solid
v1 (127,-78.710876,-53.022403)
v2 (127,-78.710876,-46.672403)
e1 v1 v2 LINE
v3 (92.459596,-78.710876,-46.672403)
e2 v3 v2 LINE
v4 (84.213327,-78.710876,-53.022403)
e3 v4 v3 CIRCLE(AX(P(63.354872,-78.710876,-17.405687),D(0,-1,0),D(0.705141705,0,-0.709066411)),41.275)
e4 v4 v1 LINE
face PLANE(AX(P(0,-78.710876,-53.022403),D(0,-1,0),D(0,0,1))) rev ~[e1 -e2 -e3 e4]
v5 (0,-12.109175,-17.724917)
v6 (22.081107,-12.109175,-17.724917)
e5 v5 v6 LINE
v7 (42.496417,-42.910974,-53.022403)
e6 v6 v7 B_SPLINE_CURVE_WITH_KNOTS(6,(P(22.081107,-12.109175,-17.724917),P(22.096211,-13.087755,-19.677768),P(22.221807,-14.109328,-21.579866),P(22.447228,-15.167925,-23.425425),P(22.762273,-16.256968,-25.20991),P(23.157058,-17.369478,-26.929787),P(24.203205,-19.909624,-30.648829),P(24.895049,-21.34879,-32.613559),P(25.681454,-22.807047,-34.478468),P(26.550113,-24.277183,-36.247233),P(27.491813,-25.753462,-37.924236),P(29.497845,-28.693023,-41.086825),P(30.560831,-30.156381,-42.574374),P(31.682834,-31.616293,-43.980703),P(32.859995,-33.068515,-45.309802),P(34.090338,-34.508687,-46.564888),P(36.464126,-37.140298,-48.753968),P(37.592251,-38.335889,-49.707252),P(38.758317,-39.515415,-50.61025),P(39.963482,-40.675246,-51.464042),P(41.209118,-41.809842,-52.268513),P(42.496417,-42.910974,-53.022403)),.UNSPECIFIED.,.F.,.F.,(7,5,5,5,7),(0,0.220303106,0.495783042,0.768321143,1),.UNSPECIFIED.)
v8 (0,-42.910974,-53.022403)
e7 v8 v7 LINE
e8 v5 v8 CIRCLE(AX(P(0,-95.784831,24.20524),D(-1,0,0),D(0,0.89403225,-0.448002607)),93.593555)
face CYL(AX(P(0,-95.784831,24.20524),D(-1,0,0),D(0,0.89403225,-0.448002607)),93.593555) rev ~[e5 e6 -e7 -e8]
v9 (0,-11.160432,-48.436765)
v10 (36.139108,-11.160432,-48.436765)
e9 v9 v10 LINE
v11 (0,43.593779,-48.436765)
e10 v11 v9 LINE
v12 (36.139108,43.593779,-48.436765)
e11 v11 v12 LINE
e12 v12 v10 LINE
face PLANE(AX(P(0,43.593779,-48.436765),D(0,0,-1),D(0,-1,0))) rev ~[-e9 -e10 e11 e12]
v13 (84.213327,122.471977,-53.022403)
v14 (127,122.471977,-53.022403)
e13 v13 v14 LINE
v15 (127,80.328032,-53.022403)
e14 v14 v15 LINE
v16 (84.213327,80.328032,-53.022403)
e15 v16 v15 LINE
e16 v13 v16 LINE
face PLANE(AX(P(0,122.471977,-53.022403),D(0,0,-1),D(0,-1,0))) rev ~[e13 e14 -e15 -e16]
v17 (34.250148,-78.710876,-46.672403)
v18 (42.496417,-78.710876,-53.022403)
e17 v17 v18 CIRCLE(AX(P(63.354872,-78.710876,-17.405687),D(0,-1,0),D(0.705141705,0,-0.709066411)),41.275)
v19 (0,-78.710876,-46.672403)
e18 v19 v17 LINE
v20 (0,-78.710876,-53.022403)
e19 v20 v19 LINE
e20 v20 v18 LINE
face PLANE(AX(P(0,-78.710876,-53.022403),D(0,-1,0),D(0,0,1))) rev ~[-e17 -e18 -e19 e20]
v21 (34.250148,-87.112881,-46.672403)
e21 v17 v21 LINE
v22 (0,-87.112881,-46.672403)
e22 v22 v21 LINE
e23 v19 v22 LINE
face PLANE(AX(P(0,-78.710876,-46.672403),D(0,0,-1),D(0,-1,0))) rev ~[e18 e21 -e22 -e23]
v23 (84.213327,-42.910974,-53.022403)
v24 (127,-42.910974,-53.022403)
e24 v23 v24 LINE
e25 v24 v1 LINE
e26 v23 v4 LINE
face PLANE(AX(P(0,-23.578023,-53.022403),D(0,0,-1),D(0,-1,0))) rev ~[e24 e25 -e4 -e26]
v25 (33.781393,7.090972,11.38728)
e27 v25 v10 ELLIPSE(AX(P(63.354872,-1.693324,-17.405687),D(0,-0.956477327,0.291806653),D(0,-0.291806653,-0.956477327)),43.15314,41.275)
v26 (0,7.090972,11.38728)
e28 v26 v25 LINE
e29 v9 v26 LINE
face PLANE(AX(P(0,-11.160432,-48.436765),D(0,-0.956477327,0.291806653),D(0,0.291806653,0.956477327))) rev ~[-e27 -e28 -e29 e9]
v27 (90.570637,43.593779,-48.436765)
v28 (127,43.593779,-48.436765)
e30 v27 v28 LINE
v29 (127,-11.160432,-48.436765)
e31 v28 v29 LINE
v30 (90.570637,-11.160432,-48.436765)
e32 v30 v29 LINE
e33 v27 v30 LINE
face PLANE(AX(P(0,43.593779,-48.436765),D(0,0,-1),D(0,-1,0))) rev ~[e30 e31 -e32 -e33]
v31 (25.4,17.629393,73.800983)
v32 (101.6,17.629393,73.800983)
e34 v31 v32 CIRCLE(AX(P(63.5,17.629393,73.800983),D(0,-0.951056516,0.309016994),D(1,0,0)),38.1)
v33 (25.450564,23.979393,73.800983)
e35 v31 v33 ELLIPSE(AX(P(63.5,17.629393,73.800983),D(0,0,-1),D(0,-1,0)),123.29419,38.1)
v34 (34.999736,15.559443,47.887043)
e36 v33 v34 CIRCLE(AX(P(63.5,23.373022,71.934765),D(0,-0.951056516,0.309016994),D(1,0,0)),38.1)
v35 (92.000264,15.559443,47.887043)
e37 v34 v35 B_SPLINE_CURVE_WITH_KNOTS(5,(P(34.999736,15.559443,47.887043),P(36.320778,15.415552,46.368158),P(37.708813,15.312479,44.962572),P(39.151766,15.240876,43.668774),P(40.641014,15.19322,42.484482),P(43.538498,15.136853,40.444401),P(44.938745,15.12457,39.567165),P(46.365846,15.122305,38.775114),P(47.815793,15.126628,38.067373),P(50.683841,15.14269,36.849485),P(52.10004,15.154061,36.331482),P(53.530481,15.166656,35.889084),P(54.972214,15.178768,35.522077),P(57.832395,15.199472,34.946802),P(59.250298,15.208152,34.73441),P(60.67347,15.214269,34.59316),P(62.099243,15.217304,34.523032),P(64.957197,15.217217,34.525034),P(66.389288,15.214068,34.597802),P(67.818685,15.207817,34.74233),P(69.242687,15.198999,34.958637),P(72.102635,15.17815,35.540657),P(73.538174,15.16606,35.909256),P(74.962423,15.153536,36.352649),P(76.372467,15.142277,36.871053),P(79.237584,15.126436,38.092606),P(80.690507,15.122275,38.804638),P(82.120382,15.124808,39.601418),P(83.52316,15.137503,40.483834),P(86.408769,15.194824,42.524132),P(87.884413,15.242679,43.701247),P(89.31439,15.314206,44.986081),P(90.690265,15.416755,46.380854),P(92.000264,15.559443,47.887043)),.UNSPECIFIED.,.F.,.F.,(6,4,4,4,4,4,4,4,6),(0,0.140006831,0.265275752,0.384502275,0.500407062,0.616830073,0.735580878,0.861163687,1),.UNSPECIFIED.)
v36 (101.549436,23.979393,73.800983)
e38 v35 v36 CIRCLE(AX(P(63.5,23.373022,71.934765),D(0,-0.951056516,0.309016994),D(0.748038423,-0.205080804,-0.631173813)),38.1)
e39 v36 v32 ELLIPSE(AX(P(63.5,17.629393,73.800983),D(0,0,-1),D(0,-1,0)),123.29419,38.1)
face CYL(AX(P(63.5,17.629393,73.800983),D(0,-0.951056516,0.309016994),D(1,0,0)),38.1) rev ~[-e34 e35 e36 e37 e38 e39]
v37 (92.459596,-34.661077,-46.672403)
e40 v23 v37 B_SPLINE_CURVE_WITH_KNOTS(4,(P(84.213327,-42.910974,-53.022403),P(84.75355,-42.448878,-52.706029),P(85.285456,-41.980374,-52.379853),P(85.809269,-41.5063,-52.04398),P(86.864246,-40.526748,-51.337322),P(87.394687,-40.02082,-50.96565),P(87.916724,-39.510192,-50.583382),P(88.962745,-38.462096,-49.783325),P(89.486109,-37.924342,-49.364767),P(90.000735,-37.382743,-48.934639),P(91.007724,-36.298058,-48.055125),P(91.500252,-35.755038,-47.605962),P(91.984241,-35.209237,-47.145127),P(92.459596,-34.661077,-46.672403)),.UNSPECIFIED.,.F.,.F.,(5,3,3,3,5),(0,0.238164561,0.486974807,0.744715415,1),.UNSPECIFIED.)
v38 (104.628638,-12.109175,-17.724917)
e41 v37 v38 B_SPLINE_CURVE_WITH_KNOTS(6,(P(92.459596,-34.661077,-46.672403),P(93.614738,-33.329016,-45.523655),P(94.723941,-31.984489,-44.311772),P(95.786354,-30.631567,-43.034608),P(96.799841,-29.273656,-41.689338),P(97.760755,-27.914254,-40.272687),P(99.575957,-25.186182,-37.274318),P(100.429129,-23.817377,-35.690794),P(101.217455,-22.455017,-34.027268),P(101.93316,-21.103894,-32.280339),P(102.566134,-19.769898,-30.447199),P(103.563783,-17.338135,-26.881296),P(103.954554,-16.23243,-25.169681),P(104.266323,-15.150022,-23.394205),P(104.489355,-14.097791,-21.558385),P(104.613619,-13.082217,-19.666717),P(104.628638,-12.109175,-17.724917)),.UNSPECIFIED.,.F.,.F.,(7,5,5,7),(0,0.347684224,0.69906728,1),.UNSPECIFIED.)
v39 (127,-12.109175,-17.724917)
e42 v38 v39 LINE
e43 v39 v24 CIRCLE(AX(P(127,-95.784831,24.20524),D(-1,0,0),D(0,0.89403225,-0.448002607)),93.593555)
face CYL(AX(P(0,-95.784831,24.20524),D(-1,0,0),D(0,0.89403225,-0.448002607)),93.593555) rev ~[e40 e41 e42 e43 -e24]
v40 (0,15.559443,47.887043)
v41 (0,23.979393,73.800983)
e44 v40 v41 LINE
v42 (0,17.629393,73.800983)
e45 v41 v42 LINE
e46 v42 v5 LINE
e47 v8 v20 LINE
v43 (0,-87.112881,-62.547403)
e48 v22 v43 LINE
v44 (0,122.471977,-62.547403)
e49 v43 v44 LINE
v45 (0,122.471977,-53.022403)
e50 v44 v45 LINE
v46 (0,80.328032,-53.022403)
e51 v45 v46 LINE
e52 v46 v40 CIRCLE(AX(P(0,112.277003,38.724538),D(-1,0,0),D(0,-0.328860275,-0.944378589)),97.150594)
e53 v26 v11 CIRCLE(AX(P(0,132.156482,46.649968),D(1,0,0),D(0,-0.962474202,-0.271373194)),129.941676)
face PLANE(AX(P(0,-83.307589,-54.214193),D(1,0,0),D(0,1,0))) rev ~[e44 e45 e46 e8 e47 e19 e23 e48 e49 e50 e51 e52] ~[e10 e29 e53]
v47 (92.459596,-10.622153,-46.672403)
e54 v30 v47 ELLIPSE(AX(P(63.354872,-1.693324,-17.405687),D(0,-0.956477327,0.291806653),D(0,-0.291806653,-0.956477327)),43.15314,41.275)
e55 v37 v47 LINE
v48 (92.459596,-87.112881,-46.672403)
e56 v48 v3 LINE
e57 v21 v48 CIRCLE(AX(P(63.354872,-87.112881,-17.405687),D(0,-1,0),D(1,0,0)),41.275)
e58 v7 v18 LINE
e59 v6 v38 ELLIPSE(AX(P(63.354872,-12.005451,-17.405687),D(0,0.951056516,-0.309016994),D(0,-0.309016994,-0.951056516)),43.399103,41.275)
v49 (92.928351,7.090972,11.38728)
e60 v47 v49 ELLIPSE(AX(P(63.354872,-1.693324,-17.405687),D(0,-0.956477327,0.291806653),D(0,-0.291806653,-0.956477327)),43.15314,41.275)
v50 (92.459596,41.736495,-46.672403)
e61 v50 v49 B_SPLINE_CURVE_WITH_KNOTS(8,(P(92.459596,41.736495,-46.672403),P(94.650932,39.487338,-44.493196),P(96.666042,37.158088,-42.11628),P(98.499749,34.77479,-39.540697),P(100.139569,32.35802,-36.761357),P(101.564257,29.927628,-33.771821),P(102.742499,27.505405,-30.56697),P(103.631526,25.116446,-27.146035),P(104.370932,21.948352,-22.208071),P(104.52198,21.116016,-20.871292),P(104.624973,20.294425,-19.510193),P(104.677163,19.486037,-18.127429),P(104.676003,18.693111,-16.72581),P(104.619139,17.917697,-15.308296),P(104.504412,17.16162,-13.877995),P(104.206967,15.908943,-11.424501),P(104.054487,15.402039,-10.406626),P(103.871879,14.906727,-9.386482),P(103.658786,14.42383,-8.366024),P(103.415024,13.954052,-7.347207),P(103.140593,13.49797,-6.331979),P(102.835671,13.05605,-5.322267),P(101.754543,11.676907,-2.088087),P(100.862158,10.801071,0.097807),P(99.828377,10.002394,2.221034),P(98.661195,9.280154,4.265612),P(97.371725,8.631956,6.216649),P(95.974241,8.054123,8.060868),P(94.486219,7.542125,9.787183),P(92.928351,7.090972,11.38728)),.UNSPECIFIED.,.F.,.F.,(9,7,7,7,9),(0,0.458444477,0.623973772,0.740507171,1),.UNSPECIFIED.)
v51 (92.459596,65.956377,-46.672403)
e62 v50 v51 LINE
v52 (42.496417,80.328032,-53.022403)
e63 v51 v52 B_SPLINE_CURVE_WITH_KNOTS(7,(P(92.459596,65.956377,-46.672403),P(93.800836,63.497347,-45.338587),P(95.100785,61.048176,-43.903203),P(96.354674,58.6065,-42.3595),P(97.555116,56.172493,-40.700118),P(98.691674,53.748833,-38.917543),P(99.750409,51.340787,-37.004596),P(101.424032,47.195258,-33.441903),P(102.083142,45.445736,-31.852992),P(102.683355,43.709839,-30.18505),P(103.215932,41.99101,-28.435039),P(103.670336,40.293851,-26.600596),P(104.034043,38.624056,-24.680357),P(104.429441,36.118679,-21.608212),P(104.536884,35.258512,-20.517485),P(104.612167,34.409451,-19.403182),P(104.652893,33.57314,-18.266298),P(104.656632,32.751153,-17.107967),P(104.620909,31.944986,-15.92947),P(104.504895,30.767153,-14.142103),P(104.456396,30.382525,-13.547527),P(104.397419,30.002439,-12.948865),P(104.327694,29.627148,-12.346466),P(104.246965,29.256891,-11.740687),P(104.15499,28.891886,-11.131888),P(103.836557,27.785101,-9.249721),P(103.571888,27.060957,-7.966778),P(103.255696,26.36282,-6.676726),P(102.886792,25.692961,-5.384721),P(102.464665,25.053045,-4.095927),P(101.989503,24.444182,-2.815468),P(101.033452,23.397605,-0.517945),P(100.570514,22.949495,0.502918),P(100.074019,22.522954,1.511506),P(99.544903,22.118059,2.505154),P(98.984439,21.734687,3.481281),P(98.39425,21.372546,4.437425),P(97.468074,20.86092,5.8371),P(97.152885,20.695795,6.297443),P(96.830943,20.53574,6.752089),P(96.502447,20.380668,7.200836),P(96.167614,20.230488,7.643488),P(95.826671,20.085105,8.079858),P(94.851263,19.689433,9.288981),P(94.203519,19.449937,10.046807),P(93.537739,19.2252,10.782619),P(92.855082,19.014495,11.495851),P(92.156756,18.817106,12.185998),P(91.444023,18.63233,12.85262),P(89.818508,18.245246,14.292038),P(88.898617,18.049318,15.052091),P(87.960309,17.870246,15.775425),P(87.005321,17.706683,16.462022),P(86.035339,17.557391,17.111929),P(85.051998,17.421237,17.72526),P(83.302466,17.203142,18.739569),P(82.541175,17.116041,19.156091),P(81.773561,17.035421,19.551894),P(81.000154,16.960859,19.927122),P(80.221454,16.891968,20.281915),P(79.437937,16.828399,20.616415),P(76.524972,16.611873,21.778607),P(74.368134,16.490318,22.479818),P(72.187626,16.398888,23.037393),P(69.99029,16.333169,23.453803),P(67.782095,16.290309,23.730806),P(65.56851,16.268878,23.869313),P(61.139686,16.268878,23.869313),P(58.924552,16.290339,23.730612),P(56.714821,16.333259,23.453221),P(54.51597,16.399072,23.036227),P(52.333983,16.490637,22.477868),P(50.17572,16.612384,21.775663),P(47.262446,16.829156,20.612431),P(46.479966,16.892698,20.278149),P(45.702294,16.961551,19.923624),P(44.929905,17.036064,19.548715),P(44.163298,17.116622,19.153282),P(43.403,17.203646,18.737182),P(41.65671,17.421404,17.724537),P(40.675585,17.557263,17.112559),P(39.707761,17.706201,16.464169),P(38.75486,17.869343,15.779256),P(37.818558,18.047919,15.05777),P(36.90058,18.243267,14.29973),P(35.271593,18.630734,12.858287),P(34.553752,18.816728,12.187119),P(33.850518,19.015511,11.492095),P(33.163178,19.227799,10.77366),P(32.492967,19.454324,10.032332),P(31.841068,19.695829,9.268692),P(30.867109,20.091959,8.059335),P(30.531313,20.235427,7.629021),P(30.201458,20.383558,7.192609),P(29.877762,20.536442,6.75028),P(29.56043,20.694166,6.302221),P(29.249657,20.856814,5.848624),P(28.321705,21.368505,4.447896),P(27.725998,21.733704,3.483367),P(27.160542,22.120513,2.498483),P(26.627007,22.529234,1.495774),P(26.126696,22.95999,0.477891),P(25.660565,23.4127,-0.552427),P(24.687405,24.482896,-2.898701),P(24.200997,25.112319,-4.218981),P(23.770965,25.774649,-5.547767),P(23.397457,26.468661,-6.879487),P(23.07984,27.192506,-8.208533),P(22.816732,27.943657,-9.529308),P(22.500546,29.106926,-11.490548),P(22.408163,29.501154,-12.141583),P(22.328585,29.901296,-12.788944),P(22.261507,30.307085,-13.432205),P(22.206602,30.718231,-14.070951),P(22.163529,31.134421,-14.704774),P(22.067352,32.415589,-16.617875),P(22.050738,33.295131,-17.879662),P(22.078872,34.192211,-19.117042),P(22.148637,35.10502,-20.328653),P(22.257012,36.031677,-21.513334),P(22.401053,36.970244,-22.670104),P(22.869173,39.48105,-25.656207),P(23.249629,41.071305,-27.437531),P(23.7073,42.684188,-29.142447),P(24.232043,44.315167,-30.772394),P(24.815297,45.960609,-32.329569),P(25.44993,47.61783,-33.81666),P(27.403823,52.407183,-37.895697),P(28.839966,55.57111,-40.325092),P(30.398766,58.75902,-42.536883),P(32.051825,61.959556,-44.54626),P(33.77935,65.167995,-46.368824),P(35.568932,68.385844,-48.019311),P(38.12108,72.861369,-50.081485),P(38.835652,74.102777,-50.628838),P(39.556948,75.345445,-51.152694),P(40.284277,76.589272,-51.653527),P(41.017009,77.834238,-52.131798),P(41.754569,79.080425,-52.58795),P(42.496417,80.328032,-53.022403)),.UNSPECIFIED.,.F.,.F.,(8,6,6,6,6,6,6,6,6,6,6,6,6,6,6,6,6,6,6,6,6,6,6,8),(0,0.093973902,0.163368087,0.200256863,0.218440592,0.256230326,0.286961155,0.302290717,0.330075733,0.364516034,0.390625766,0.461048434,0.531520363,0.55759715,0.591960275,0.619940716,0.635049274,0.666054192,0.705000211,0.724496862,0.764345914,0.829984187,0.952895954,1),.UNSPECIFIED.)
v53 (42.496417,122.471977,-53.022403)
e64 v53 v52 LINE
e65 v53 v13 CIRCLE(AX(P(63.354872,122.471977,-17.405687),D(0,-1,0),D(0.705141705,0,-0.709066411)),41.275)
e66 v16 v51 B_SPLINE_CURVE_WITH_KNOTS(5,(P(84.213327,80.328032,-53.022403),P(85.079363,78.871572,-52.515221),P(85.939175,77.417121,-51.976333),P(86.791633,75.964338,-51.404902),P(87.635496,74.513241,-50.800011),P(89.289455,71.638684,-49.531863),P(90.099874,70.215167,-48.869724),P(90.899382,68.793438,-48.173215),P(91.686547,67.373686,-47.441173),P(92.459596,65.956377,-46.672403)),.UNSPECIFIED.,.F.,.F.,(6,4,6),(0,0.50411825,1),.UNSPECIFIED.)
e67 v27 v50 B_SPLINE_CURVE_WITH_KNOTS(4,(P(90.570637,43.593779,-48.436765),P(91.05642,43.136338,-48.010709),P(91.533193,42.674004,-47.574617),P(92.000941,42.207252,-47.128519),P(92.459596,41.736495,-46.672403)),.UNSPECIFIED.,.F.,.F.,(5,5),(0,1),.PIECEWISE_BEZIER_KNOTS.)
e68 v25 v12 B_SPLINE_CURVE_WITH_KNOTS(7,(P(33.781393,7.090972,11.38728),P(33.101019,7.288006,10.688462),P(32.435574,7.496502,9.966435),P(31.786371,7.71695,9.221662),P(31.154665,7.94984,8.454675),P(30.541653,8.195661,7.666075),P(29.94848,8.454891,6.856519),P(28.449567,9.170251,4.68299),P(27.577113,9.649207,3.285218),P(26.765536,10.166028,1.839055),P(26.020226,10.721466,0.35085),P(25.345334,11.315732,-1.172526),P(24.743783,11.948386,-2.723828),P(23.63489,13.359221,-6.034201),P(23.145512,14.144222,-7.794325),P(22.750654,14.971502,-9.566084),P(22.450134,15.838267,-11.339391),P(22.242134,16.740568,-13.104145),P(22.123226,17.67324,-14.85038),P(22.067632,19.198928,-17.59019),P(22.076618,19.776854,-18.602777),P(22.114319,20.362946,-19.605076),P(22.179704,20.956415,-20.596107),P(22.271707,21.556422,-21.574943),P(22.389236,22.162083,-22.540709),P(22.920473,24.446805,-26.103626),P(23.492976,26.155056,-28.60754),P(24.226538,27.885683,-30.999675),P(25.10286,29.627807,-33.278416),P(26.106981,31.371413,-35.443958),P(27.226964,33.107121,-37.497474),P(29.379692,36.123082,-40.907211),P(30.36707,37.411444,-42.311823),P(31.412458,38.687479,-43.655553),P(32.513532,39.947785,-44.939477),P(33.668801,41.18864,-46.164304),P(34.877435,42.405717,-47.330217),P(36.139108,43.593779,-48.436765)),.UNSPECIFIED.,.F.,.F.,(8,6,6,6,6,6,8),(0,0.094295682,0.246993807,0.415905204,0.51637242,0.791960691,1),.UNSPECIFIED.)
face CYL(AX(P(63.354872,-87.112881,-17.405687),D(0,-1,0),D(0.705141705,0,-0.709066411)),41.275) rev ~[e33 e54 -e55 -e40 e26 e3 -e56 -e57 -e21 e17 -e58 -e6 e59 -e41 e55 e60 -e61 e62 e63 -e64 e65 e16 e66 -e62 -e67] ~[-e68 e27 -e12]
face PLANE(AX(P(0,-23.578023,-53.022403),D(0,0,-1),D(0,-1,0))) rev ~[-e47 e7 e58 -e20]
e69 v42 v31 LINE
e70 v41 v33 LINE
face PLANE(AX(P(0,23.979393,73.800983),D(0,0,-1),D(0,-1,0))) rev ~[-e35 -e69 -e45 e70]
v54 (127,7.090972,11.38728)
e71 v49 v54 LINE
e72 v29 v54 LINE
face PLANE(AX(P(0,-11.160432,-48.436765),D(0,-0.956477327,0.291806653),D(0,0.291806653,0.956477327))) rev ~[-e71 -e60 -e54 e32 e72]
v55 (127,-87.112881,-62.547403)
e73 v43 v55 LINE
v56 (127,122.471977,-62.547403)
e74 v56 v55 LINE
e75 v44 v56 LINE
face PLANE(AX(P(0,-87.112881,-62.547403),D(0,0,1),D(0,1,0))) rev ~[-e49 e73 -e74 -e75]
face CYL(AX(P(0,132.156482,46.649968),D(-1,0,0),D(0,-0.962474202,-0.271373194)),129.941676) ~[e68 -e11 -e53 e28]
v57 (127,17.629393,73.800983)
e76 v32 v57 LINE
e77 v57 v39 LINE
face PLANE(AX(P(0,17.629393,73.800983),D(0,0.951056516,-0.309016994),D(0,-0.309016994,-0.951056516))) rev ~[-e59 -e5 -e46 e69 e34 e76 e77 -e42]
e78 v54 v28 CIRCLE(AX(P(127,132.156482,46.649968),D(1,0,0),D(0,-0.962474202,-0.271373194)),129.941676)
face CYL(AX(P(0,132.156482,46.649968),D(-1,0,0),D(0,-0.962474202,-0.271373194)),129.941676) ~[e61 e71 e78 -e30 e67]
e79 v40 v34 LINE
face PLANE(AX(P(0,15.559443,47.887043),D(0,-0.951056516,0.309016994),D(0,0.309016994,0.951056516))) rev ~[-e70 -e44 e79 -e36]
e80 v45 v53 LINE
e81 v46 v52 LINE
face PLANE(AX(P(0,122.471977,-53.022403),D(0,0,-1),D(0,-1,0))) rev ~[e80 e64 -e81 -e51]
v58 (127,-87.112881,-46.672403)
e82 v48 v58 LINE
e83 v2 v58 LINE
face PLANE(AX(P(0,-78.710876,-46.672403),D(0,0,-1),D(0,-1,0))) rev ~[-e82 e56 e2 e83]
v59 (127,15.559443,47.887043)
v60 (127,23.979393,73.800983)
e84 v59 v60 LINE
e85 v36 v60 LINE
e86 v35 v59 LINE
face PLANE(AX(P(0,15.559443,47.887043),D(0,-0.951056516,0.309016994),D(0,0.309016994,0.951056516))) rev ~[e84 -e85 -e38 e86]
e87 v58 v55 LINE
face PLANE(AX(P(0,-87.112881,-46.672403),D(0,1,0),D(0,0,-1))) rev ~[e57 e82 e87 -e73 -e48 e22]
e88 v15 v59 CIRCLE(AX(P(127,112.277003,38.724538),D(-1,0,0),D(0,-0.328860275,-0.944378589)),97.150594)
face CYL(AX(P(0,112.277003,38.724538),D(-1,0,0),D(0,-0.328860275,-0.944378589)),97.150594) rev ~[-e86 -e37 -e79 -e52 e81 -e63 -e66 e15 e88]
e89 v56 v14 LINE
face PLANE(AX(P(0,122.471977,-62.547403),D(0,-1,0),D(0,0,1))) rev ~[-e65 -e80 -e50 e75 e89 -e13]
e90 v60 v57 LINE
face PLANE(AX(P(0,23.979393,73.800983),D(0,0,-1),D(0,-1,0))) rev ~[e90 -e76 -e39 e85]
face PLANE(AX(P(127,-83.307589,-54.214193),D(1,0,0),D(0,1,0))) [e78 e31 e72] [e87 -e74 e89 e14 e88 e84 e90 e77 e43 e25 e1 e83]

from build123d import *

# Parameters (mm, degrees)
F1_DEPTH = 127
F2_DEPTH = 127
F3_DEPTH = 127
F4_DEPTH = 127
F5_DEPTH = 127
F7_DEPTH = 114.3
F9_DEPTH = 215.9


# Not quite as in the source:
# - a feature names something its author has since deleted; it is built from what else it names


with BuildPart() as f1:
    # F0 (on Right) → F1 (new body)
    with BuildSketch(Plane.YZ):
        Polygon((-23.5780230826, -53.0224030194), (-17.2280230826, -53.0224030194), (15.5594434607, 47.8870429867), (23.9793931173, 73.8009834286), (17.6293931173, 73.8009834286), (-12.109174605, -17.7249168697), align=None)
        Polygon((-80.7280230826, -53.0224030194), (-80.7280230826, -62.5474030194), (122.4719769174, -62.5474030194), (122.4719769174, -53.0224030194), (80.3280323744, -53.0224030194), (-17.2280230826, -53.0224030194), (-23.5780230826, -53.0224030194), (-42.9109744728, -53.0224030194), (-78.7108764052, -53.0224030194), align=None)
    extrude(amount=F1_DEPTH)

    # F0 (on Right) → F2 (join)
    with BuildSketch(Plane.YZ):
        with BuildLine():
            Line((-17.2280230826, -53.0224030194), (80.3280323744, -53.0224030194))
            ThreePointArc((80.3280323744, -53.0224030194), (30.5185291001, -13.7520262922), (15.5594434607, 47.8870429867))
            Line((15.5594434607, 47.8870429867), (-17.2280230826, -53.0224030194))
        make_face()
        with BuildLine():
            Line((-11.1604323611, -48.4367646277), (7.0909718052, 11.3872801885))
            ThreePointArc((7.0909718052, 11.3872801885), (21.2331642185, -21.0320576084), (43.5937792063, -48.4367646277))
            Line((43.5937792063, -48.4367646277), (-11.1604323611, -48.4367646277))
        make_face(mode=Mode.SUBTRACT)
    extrude(amount=F2_DEPTH)

    # F0 (on Right) → F3 (cut)
    with BuildSketch(Plane.YZ):
        with BuildLine():
            ThreePointArc((43.5937792063, -48.4367646277), (21.2331642185, -21.0320576084), (7.0909718052, 11.3872801885))
            Line((7.0909718052, 11.3872801885), (-11.1604323611, -48.4367646277))
            Line((-11.1604323611, -48.4367646277), (43.5937792063, -48.4367646277))
        make_face()
    extrude(amount=-F3_DEPTH, mode=Mode.SUBTRACT)

    # F0 (on Right) → F4 (join)
    with BuildSketch(Plane.YZ):
        with BuildLine():
            ThreePointArc((-12.109174605, -17.7249168697), (-25.2658938129, -37.3320091963), (-42.9109744728, -53.0224030194))
            Line((-42.9109744728, -53.0224030194), (-23.5780230826, -53.0224030194))
            Line((-23.5780230826, -53.0224030194), (-12.109174605, -17.7249168697))
        make_face()
    extrude(amount=F4_DEPTH)

    # F0 (on Right) → F5 (join)
    with BuildSketch(Plane.YZ):
        Polygon((-87.1128812432, -62.5474030194), (-80.7280230826, -62.5474030194), (-80.7280230826, -53.0224030194), (-78.7108764052, -53.0224030194), (-78.7108764052, -46.6724030194), (-87.1128812432, -46.6724030194), align=None)
    extrude(amount=F5_DEPTH)

    # F6 (on face) → F7 (cut)
    with BuildSketch(Plane(origin=(0, -5.7436289571, 1.866218176), x_dir=(1, 0, 0), z_dir=(0, -0.9510565163, 0.3090169944))):
        with BuildLine():
            ThreePointArc((25.4, 75.6366882725), (63.5, 37.5366882725), (101.6, 75.6366882725))
            Line((101.6, 75.6366882725), (25.4, 75.6366882725))
        make_face()
        with BuildLine():
            Line((25.4, 75.6366882725), (101.6, 75.6366882725))
            ThreePointArc((101.6, 75.6366882725), (63.5, 113.7366882725), (25.4, 75.6366882725))
        make_face()
    extrude(amount=-F7_DEPTH, mode=Mode.SUBTRACT)

    # F8 (on face) → F9 (cut)
    with BuildSketch(Plane.XZ.offset(87.1128812432)):
        with BuildLine():
            Line((92.459596055, -46.6724030194), (34.2501482793, -46.6724030194))
            ThreePointArc((34.2501482793, -46.6724030194), (63.3548721671, -58.6806869), (92.459596055, -46.6724030194))
        make_face()
        with BuildLine():
            ThreePointArc((92.459596055, -46.6724030194), (101.4660457483, -33.2538436782), (104.6298721671, -17.4056869))
            ThreePointArc((104.6298721671, -17.4056869), (47.506715389, 20.7054866812), (34.2501482793, -46.6724030194))
            Line((34.2501482793, -46.6724030194), (92.459596055, -46.6724030194))
        make_face()
    extrude(amount=-F9_DEPTH, mode=Mode.SUBTRACT)


solid = f1.part
